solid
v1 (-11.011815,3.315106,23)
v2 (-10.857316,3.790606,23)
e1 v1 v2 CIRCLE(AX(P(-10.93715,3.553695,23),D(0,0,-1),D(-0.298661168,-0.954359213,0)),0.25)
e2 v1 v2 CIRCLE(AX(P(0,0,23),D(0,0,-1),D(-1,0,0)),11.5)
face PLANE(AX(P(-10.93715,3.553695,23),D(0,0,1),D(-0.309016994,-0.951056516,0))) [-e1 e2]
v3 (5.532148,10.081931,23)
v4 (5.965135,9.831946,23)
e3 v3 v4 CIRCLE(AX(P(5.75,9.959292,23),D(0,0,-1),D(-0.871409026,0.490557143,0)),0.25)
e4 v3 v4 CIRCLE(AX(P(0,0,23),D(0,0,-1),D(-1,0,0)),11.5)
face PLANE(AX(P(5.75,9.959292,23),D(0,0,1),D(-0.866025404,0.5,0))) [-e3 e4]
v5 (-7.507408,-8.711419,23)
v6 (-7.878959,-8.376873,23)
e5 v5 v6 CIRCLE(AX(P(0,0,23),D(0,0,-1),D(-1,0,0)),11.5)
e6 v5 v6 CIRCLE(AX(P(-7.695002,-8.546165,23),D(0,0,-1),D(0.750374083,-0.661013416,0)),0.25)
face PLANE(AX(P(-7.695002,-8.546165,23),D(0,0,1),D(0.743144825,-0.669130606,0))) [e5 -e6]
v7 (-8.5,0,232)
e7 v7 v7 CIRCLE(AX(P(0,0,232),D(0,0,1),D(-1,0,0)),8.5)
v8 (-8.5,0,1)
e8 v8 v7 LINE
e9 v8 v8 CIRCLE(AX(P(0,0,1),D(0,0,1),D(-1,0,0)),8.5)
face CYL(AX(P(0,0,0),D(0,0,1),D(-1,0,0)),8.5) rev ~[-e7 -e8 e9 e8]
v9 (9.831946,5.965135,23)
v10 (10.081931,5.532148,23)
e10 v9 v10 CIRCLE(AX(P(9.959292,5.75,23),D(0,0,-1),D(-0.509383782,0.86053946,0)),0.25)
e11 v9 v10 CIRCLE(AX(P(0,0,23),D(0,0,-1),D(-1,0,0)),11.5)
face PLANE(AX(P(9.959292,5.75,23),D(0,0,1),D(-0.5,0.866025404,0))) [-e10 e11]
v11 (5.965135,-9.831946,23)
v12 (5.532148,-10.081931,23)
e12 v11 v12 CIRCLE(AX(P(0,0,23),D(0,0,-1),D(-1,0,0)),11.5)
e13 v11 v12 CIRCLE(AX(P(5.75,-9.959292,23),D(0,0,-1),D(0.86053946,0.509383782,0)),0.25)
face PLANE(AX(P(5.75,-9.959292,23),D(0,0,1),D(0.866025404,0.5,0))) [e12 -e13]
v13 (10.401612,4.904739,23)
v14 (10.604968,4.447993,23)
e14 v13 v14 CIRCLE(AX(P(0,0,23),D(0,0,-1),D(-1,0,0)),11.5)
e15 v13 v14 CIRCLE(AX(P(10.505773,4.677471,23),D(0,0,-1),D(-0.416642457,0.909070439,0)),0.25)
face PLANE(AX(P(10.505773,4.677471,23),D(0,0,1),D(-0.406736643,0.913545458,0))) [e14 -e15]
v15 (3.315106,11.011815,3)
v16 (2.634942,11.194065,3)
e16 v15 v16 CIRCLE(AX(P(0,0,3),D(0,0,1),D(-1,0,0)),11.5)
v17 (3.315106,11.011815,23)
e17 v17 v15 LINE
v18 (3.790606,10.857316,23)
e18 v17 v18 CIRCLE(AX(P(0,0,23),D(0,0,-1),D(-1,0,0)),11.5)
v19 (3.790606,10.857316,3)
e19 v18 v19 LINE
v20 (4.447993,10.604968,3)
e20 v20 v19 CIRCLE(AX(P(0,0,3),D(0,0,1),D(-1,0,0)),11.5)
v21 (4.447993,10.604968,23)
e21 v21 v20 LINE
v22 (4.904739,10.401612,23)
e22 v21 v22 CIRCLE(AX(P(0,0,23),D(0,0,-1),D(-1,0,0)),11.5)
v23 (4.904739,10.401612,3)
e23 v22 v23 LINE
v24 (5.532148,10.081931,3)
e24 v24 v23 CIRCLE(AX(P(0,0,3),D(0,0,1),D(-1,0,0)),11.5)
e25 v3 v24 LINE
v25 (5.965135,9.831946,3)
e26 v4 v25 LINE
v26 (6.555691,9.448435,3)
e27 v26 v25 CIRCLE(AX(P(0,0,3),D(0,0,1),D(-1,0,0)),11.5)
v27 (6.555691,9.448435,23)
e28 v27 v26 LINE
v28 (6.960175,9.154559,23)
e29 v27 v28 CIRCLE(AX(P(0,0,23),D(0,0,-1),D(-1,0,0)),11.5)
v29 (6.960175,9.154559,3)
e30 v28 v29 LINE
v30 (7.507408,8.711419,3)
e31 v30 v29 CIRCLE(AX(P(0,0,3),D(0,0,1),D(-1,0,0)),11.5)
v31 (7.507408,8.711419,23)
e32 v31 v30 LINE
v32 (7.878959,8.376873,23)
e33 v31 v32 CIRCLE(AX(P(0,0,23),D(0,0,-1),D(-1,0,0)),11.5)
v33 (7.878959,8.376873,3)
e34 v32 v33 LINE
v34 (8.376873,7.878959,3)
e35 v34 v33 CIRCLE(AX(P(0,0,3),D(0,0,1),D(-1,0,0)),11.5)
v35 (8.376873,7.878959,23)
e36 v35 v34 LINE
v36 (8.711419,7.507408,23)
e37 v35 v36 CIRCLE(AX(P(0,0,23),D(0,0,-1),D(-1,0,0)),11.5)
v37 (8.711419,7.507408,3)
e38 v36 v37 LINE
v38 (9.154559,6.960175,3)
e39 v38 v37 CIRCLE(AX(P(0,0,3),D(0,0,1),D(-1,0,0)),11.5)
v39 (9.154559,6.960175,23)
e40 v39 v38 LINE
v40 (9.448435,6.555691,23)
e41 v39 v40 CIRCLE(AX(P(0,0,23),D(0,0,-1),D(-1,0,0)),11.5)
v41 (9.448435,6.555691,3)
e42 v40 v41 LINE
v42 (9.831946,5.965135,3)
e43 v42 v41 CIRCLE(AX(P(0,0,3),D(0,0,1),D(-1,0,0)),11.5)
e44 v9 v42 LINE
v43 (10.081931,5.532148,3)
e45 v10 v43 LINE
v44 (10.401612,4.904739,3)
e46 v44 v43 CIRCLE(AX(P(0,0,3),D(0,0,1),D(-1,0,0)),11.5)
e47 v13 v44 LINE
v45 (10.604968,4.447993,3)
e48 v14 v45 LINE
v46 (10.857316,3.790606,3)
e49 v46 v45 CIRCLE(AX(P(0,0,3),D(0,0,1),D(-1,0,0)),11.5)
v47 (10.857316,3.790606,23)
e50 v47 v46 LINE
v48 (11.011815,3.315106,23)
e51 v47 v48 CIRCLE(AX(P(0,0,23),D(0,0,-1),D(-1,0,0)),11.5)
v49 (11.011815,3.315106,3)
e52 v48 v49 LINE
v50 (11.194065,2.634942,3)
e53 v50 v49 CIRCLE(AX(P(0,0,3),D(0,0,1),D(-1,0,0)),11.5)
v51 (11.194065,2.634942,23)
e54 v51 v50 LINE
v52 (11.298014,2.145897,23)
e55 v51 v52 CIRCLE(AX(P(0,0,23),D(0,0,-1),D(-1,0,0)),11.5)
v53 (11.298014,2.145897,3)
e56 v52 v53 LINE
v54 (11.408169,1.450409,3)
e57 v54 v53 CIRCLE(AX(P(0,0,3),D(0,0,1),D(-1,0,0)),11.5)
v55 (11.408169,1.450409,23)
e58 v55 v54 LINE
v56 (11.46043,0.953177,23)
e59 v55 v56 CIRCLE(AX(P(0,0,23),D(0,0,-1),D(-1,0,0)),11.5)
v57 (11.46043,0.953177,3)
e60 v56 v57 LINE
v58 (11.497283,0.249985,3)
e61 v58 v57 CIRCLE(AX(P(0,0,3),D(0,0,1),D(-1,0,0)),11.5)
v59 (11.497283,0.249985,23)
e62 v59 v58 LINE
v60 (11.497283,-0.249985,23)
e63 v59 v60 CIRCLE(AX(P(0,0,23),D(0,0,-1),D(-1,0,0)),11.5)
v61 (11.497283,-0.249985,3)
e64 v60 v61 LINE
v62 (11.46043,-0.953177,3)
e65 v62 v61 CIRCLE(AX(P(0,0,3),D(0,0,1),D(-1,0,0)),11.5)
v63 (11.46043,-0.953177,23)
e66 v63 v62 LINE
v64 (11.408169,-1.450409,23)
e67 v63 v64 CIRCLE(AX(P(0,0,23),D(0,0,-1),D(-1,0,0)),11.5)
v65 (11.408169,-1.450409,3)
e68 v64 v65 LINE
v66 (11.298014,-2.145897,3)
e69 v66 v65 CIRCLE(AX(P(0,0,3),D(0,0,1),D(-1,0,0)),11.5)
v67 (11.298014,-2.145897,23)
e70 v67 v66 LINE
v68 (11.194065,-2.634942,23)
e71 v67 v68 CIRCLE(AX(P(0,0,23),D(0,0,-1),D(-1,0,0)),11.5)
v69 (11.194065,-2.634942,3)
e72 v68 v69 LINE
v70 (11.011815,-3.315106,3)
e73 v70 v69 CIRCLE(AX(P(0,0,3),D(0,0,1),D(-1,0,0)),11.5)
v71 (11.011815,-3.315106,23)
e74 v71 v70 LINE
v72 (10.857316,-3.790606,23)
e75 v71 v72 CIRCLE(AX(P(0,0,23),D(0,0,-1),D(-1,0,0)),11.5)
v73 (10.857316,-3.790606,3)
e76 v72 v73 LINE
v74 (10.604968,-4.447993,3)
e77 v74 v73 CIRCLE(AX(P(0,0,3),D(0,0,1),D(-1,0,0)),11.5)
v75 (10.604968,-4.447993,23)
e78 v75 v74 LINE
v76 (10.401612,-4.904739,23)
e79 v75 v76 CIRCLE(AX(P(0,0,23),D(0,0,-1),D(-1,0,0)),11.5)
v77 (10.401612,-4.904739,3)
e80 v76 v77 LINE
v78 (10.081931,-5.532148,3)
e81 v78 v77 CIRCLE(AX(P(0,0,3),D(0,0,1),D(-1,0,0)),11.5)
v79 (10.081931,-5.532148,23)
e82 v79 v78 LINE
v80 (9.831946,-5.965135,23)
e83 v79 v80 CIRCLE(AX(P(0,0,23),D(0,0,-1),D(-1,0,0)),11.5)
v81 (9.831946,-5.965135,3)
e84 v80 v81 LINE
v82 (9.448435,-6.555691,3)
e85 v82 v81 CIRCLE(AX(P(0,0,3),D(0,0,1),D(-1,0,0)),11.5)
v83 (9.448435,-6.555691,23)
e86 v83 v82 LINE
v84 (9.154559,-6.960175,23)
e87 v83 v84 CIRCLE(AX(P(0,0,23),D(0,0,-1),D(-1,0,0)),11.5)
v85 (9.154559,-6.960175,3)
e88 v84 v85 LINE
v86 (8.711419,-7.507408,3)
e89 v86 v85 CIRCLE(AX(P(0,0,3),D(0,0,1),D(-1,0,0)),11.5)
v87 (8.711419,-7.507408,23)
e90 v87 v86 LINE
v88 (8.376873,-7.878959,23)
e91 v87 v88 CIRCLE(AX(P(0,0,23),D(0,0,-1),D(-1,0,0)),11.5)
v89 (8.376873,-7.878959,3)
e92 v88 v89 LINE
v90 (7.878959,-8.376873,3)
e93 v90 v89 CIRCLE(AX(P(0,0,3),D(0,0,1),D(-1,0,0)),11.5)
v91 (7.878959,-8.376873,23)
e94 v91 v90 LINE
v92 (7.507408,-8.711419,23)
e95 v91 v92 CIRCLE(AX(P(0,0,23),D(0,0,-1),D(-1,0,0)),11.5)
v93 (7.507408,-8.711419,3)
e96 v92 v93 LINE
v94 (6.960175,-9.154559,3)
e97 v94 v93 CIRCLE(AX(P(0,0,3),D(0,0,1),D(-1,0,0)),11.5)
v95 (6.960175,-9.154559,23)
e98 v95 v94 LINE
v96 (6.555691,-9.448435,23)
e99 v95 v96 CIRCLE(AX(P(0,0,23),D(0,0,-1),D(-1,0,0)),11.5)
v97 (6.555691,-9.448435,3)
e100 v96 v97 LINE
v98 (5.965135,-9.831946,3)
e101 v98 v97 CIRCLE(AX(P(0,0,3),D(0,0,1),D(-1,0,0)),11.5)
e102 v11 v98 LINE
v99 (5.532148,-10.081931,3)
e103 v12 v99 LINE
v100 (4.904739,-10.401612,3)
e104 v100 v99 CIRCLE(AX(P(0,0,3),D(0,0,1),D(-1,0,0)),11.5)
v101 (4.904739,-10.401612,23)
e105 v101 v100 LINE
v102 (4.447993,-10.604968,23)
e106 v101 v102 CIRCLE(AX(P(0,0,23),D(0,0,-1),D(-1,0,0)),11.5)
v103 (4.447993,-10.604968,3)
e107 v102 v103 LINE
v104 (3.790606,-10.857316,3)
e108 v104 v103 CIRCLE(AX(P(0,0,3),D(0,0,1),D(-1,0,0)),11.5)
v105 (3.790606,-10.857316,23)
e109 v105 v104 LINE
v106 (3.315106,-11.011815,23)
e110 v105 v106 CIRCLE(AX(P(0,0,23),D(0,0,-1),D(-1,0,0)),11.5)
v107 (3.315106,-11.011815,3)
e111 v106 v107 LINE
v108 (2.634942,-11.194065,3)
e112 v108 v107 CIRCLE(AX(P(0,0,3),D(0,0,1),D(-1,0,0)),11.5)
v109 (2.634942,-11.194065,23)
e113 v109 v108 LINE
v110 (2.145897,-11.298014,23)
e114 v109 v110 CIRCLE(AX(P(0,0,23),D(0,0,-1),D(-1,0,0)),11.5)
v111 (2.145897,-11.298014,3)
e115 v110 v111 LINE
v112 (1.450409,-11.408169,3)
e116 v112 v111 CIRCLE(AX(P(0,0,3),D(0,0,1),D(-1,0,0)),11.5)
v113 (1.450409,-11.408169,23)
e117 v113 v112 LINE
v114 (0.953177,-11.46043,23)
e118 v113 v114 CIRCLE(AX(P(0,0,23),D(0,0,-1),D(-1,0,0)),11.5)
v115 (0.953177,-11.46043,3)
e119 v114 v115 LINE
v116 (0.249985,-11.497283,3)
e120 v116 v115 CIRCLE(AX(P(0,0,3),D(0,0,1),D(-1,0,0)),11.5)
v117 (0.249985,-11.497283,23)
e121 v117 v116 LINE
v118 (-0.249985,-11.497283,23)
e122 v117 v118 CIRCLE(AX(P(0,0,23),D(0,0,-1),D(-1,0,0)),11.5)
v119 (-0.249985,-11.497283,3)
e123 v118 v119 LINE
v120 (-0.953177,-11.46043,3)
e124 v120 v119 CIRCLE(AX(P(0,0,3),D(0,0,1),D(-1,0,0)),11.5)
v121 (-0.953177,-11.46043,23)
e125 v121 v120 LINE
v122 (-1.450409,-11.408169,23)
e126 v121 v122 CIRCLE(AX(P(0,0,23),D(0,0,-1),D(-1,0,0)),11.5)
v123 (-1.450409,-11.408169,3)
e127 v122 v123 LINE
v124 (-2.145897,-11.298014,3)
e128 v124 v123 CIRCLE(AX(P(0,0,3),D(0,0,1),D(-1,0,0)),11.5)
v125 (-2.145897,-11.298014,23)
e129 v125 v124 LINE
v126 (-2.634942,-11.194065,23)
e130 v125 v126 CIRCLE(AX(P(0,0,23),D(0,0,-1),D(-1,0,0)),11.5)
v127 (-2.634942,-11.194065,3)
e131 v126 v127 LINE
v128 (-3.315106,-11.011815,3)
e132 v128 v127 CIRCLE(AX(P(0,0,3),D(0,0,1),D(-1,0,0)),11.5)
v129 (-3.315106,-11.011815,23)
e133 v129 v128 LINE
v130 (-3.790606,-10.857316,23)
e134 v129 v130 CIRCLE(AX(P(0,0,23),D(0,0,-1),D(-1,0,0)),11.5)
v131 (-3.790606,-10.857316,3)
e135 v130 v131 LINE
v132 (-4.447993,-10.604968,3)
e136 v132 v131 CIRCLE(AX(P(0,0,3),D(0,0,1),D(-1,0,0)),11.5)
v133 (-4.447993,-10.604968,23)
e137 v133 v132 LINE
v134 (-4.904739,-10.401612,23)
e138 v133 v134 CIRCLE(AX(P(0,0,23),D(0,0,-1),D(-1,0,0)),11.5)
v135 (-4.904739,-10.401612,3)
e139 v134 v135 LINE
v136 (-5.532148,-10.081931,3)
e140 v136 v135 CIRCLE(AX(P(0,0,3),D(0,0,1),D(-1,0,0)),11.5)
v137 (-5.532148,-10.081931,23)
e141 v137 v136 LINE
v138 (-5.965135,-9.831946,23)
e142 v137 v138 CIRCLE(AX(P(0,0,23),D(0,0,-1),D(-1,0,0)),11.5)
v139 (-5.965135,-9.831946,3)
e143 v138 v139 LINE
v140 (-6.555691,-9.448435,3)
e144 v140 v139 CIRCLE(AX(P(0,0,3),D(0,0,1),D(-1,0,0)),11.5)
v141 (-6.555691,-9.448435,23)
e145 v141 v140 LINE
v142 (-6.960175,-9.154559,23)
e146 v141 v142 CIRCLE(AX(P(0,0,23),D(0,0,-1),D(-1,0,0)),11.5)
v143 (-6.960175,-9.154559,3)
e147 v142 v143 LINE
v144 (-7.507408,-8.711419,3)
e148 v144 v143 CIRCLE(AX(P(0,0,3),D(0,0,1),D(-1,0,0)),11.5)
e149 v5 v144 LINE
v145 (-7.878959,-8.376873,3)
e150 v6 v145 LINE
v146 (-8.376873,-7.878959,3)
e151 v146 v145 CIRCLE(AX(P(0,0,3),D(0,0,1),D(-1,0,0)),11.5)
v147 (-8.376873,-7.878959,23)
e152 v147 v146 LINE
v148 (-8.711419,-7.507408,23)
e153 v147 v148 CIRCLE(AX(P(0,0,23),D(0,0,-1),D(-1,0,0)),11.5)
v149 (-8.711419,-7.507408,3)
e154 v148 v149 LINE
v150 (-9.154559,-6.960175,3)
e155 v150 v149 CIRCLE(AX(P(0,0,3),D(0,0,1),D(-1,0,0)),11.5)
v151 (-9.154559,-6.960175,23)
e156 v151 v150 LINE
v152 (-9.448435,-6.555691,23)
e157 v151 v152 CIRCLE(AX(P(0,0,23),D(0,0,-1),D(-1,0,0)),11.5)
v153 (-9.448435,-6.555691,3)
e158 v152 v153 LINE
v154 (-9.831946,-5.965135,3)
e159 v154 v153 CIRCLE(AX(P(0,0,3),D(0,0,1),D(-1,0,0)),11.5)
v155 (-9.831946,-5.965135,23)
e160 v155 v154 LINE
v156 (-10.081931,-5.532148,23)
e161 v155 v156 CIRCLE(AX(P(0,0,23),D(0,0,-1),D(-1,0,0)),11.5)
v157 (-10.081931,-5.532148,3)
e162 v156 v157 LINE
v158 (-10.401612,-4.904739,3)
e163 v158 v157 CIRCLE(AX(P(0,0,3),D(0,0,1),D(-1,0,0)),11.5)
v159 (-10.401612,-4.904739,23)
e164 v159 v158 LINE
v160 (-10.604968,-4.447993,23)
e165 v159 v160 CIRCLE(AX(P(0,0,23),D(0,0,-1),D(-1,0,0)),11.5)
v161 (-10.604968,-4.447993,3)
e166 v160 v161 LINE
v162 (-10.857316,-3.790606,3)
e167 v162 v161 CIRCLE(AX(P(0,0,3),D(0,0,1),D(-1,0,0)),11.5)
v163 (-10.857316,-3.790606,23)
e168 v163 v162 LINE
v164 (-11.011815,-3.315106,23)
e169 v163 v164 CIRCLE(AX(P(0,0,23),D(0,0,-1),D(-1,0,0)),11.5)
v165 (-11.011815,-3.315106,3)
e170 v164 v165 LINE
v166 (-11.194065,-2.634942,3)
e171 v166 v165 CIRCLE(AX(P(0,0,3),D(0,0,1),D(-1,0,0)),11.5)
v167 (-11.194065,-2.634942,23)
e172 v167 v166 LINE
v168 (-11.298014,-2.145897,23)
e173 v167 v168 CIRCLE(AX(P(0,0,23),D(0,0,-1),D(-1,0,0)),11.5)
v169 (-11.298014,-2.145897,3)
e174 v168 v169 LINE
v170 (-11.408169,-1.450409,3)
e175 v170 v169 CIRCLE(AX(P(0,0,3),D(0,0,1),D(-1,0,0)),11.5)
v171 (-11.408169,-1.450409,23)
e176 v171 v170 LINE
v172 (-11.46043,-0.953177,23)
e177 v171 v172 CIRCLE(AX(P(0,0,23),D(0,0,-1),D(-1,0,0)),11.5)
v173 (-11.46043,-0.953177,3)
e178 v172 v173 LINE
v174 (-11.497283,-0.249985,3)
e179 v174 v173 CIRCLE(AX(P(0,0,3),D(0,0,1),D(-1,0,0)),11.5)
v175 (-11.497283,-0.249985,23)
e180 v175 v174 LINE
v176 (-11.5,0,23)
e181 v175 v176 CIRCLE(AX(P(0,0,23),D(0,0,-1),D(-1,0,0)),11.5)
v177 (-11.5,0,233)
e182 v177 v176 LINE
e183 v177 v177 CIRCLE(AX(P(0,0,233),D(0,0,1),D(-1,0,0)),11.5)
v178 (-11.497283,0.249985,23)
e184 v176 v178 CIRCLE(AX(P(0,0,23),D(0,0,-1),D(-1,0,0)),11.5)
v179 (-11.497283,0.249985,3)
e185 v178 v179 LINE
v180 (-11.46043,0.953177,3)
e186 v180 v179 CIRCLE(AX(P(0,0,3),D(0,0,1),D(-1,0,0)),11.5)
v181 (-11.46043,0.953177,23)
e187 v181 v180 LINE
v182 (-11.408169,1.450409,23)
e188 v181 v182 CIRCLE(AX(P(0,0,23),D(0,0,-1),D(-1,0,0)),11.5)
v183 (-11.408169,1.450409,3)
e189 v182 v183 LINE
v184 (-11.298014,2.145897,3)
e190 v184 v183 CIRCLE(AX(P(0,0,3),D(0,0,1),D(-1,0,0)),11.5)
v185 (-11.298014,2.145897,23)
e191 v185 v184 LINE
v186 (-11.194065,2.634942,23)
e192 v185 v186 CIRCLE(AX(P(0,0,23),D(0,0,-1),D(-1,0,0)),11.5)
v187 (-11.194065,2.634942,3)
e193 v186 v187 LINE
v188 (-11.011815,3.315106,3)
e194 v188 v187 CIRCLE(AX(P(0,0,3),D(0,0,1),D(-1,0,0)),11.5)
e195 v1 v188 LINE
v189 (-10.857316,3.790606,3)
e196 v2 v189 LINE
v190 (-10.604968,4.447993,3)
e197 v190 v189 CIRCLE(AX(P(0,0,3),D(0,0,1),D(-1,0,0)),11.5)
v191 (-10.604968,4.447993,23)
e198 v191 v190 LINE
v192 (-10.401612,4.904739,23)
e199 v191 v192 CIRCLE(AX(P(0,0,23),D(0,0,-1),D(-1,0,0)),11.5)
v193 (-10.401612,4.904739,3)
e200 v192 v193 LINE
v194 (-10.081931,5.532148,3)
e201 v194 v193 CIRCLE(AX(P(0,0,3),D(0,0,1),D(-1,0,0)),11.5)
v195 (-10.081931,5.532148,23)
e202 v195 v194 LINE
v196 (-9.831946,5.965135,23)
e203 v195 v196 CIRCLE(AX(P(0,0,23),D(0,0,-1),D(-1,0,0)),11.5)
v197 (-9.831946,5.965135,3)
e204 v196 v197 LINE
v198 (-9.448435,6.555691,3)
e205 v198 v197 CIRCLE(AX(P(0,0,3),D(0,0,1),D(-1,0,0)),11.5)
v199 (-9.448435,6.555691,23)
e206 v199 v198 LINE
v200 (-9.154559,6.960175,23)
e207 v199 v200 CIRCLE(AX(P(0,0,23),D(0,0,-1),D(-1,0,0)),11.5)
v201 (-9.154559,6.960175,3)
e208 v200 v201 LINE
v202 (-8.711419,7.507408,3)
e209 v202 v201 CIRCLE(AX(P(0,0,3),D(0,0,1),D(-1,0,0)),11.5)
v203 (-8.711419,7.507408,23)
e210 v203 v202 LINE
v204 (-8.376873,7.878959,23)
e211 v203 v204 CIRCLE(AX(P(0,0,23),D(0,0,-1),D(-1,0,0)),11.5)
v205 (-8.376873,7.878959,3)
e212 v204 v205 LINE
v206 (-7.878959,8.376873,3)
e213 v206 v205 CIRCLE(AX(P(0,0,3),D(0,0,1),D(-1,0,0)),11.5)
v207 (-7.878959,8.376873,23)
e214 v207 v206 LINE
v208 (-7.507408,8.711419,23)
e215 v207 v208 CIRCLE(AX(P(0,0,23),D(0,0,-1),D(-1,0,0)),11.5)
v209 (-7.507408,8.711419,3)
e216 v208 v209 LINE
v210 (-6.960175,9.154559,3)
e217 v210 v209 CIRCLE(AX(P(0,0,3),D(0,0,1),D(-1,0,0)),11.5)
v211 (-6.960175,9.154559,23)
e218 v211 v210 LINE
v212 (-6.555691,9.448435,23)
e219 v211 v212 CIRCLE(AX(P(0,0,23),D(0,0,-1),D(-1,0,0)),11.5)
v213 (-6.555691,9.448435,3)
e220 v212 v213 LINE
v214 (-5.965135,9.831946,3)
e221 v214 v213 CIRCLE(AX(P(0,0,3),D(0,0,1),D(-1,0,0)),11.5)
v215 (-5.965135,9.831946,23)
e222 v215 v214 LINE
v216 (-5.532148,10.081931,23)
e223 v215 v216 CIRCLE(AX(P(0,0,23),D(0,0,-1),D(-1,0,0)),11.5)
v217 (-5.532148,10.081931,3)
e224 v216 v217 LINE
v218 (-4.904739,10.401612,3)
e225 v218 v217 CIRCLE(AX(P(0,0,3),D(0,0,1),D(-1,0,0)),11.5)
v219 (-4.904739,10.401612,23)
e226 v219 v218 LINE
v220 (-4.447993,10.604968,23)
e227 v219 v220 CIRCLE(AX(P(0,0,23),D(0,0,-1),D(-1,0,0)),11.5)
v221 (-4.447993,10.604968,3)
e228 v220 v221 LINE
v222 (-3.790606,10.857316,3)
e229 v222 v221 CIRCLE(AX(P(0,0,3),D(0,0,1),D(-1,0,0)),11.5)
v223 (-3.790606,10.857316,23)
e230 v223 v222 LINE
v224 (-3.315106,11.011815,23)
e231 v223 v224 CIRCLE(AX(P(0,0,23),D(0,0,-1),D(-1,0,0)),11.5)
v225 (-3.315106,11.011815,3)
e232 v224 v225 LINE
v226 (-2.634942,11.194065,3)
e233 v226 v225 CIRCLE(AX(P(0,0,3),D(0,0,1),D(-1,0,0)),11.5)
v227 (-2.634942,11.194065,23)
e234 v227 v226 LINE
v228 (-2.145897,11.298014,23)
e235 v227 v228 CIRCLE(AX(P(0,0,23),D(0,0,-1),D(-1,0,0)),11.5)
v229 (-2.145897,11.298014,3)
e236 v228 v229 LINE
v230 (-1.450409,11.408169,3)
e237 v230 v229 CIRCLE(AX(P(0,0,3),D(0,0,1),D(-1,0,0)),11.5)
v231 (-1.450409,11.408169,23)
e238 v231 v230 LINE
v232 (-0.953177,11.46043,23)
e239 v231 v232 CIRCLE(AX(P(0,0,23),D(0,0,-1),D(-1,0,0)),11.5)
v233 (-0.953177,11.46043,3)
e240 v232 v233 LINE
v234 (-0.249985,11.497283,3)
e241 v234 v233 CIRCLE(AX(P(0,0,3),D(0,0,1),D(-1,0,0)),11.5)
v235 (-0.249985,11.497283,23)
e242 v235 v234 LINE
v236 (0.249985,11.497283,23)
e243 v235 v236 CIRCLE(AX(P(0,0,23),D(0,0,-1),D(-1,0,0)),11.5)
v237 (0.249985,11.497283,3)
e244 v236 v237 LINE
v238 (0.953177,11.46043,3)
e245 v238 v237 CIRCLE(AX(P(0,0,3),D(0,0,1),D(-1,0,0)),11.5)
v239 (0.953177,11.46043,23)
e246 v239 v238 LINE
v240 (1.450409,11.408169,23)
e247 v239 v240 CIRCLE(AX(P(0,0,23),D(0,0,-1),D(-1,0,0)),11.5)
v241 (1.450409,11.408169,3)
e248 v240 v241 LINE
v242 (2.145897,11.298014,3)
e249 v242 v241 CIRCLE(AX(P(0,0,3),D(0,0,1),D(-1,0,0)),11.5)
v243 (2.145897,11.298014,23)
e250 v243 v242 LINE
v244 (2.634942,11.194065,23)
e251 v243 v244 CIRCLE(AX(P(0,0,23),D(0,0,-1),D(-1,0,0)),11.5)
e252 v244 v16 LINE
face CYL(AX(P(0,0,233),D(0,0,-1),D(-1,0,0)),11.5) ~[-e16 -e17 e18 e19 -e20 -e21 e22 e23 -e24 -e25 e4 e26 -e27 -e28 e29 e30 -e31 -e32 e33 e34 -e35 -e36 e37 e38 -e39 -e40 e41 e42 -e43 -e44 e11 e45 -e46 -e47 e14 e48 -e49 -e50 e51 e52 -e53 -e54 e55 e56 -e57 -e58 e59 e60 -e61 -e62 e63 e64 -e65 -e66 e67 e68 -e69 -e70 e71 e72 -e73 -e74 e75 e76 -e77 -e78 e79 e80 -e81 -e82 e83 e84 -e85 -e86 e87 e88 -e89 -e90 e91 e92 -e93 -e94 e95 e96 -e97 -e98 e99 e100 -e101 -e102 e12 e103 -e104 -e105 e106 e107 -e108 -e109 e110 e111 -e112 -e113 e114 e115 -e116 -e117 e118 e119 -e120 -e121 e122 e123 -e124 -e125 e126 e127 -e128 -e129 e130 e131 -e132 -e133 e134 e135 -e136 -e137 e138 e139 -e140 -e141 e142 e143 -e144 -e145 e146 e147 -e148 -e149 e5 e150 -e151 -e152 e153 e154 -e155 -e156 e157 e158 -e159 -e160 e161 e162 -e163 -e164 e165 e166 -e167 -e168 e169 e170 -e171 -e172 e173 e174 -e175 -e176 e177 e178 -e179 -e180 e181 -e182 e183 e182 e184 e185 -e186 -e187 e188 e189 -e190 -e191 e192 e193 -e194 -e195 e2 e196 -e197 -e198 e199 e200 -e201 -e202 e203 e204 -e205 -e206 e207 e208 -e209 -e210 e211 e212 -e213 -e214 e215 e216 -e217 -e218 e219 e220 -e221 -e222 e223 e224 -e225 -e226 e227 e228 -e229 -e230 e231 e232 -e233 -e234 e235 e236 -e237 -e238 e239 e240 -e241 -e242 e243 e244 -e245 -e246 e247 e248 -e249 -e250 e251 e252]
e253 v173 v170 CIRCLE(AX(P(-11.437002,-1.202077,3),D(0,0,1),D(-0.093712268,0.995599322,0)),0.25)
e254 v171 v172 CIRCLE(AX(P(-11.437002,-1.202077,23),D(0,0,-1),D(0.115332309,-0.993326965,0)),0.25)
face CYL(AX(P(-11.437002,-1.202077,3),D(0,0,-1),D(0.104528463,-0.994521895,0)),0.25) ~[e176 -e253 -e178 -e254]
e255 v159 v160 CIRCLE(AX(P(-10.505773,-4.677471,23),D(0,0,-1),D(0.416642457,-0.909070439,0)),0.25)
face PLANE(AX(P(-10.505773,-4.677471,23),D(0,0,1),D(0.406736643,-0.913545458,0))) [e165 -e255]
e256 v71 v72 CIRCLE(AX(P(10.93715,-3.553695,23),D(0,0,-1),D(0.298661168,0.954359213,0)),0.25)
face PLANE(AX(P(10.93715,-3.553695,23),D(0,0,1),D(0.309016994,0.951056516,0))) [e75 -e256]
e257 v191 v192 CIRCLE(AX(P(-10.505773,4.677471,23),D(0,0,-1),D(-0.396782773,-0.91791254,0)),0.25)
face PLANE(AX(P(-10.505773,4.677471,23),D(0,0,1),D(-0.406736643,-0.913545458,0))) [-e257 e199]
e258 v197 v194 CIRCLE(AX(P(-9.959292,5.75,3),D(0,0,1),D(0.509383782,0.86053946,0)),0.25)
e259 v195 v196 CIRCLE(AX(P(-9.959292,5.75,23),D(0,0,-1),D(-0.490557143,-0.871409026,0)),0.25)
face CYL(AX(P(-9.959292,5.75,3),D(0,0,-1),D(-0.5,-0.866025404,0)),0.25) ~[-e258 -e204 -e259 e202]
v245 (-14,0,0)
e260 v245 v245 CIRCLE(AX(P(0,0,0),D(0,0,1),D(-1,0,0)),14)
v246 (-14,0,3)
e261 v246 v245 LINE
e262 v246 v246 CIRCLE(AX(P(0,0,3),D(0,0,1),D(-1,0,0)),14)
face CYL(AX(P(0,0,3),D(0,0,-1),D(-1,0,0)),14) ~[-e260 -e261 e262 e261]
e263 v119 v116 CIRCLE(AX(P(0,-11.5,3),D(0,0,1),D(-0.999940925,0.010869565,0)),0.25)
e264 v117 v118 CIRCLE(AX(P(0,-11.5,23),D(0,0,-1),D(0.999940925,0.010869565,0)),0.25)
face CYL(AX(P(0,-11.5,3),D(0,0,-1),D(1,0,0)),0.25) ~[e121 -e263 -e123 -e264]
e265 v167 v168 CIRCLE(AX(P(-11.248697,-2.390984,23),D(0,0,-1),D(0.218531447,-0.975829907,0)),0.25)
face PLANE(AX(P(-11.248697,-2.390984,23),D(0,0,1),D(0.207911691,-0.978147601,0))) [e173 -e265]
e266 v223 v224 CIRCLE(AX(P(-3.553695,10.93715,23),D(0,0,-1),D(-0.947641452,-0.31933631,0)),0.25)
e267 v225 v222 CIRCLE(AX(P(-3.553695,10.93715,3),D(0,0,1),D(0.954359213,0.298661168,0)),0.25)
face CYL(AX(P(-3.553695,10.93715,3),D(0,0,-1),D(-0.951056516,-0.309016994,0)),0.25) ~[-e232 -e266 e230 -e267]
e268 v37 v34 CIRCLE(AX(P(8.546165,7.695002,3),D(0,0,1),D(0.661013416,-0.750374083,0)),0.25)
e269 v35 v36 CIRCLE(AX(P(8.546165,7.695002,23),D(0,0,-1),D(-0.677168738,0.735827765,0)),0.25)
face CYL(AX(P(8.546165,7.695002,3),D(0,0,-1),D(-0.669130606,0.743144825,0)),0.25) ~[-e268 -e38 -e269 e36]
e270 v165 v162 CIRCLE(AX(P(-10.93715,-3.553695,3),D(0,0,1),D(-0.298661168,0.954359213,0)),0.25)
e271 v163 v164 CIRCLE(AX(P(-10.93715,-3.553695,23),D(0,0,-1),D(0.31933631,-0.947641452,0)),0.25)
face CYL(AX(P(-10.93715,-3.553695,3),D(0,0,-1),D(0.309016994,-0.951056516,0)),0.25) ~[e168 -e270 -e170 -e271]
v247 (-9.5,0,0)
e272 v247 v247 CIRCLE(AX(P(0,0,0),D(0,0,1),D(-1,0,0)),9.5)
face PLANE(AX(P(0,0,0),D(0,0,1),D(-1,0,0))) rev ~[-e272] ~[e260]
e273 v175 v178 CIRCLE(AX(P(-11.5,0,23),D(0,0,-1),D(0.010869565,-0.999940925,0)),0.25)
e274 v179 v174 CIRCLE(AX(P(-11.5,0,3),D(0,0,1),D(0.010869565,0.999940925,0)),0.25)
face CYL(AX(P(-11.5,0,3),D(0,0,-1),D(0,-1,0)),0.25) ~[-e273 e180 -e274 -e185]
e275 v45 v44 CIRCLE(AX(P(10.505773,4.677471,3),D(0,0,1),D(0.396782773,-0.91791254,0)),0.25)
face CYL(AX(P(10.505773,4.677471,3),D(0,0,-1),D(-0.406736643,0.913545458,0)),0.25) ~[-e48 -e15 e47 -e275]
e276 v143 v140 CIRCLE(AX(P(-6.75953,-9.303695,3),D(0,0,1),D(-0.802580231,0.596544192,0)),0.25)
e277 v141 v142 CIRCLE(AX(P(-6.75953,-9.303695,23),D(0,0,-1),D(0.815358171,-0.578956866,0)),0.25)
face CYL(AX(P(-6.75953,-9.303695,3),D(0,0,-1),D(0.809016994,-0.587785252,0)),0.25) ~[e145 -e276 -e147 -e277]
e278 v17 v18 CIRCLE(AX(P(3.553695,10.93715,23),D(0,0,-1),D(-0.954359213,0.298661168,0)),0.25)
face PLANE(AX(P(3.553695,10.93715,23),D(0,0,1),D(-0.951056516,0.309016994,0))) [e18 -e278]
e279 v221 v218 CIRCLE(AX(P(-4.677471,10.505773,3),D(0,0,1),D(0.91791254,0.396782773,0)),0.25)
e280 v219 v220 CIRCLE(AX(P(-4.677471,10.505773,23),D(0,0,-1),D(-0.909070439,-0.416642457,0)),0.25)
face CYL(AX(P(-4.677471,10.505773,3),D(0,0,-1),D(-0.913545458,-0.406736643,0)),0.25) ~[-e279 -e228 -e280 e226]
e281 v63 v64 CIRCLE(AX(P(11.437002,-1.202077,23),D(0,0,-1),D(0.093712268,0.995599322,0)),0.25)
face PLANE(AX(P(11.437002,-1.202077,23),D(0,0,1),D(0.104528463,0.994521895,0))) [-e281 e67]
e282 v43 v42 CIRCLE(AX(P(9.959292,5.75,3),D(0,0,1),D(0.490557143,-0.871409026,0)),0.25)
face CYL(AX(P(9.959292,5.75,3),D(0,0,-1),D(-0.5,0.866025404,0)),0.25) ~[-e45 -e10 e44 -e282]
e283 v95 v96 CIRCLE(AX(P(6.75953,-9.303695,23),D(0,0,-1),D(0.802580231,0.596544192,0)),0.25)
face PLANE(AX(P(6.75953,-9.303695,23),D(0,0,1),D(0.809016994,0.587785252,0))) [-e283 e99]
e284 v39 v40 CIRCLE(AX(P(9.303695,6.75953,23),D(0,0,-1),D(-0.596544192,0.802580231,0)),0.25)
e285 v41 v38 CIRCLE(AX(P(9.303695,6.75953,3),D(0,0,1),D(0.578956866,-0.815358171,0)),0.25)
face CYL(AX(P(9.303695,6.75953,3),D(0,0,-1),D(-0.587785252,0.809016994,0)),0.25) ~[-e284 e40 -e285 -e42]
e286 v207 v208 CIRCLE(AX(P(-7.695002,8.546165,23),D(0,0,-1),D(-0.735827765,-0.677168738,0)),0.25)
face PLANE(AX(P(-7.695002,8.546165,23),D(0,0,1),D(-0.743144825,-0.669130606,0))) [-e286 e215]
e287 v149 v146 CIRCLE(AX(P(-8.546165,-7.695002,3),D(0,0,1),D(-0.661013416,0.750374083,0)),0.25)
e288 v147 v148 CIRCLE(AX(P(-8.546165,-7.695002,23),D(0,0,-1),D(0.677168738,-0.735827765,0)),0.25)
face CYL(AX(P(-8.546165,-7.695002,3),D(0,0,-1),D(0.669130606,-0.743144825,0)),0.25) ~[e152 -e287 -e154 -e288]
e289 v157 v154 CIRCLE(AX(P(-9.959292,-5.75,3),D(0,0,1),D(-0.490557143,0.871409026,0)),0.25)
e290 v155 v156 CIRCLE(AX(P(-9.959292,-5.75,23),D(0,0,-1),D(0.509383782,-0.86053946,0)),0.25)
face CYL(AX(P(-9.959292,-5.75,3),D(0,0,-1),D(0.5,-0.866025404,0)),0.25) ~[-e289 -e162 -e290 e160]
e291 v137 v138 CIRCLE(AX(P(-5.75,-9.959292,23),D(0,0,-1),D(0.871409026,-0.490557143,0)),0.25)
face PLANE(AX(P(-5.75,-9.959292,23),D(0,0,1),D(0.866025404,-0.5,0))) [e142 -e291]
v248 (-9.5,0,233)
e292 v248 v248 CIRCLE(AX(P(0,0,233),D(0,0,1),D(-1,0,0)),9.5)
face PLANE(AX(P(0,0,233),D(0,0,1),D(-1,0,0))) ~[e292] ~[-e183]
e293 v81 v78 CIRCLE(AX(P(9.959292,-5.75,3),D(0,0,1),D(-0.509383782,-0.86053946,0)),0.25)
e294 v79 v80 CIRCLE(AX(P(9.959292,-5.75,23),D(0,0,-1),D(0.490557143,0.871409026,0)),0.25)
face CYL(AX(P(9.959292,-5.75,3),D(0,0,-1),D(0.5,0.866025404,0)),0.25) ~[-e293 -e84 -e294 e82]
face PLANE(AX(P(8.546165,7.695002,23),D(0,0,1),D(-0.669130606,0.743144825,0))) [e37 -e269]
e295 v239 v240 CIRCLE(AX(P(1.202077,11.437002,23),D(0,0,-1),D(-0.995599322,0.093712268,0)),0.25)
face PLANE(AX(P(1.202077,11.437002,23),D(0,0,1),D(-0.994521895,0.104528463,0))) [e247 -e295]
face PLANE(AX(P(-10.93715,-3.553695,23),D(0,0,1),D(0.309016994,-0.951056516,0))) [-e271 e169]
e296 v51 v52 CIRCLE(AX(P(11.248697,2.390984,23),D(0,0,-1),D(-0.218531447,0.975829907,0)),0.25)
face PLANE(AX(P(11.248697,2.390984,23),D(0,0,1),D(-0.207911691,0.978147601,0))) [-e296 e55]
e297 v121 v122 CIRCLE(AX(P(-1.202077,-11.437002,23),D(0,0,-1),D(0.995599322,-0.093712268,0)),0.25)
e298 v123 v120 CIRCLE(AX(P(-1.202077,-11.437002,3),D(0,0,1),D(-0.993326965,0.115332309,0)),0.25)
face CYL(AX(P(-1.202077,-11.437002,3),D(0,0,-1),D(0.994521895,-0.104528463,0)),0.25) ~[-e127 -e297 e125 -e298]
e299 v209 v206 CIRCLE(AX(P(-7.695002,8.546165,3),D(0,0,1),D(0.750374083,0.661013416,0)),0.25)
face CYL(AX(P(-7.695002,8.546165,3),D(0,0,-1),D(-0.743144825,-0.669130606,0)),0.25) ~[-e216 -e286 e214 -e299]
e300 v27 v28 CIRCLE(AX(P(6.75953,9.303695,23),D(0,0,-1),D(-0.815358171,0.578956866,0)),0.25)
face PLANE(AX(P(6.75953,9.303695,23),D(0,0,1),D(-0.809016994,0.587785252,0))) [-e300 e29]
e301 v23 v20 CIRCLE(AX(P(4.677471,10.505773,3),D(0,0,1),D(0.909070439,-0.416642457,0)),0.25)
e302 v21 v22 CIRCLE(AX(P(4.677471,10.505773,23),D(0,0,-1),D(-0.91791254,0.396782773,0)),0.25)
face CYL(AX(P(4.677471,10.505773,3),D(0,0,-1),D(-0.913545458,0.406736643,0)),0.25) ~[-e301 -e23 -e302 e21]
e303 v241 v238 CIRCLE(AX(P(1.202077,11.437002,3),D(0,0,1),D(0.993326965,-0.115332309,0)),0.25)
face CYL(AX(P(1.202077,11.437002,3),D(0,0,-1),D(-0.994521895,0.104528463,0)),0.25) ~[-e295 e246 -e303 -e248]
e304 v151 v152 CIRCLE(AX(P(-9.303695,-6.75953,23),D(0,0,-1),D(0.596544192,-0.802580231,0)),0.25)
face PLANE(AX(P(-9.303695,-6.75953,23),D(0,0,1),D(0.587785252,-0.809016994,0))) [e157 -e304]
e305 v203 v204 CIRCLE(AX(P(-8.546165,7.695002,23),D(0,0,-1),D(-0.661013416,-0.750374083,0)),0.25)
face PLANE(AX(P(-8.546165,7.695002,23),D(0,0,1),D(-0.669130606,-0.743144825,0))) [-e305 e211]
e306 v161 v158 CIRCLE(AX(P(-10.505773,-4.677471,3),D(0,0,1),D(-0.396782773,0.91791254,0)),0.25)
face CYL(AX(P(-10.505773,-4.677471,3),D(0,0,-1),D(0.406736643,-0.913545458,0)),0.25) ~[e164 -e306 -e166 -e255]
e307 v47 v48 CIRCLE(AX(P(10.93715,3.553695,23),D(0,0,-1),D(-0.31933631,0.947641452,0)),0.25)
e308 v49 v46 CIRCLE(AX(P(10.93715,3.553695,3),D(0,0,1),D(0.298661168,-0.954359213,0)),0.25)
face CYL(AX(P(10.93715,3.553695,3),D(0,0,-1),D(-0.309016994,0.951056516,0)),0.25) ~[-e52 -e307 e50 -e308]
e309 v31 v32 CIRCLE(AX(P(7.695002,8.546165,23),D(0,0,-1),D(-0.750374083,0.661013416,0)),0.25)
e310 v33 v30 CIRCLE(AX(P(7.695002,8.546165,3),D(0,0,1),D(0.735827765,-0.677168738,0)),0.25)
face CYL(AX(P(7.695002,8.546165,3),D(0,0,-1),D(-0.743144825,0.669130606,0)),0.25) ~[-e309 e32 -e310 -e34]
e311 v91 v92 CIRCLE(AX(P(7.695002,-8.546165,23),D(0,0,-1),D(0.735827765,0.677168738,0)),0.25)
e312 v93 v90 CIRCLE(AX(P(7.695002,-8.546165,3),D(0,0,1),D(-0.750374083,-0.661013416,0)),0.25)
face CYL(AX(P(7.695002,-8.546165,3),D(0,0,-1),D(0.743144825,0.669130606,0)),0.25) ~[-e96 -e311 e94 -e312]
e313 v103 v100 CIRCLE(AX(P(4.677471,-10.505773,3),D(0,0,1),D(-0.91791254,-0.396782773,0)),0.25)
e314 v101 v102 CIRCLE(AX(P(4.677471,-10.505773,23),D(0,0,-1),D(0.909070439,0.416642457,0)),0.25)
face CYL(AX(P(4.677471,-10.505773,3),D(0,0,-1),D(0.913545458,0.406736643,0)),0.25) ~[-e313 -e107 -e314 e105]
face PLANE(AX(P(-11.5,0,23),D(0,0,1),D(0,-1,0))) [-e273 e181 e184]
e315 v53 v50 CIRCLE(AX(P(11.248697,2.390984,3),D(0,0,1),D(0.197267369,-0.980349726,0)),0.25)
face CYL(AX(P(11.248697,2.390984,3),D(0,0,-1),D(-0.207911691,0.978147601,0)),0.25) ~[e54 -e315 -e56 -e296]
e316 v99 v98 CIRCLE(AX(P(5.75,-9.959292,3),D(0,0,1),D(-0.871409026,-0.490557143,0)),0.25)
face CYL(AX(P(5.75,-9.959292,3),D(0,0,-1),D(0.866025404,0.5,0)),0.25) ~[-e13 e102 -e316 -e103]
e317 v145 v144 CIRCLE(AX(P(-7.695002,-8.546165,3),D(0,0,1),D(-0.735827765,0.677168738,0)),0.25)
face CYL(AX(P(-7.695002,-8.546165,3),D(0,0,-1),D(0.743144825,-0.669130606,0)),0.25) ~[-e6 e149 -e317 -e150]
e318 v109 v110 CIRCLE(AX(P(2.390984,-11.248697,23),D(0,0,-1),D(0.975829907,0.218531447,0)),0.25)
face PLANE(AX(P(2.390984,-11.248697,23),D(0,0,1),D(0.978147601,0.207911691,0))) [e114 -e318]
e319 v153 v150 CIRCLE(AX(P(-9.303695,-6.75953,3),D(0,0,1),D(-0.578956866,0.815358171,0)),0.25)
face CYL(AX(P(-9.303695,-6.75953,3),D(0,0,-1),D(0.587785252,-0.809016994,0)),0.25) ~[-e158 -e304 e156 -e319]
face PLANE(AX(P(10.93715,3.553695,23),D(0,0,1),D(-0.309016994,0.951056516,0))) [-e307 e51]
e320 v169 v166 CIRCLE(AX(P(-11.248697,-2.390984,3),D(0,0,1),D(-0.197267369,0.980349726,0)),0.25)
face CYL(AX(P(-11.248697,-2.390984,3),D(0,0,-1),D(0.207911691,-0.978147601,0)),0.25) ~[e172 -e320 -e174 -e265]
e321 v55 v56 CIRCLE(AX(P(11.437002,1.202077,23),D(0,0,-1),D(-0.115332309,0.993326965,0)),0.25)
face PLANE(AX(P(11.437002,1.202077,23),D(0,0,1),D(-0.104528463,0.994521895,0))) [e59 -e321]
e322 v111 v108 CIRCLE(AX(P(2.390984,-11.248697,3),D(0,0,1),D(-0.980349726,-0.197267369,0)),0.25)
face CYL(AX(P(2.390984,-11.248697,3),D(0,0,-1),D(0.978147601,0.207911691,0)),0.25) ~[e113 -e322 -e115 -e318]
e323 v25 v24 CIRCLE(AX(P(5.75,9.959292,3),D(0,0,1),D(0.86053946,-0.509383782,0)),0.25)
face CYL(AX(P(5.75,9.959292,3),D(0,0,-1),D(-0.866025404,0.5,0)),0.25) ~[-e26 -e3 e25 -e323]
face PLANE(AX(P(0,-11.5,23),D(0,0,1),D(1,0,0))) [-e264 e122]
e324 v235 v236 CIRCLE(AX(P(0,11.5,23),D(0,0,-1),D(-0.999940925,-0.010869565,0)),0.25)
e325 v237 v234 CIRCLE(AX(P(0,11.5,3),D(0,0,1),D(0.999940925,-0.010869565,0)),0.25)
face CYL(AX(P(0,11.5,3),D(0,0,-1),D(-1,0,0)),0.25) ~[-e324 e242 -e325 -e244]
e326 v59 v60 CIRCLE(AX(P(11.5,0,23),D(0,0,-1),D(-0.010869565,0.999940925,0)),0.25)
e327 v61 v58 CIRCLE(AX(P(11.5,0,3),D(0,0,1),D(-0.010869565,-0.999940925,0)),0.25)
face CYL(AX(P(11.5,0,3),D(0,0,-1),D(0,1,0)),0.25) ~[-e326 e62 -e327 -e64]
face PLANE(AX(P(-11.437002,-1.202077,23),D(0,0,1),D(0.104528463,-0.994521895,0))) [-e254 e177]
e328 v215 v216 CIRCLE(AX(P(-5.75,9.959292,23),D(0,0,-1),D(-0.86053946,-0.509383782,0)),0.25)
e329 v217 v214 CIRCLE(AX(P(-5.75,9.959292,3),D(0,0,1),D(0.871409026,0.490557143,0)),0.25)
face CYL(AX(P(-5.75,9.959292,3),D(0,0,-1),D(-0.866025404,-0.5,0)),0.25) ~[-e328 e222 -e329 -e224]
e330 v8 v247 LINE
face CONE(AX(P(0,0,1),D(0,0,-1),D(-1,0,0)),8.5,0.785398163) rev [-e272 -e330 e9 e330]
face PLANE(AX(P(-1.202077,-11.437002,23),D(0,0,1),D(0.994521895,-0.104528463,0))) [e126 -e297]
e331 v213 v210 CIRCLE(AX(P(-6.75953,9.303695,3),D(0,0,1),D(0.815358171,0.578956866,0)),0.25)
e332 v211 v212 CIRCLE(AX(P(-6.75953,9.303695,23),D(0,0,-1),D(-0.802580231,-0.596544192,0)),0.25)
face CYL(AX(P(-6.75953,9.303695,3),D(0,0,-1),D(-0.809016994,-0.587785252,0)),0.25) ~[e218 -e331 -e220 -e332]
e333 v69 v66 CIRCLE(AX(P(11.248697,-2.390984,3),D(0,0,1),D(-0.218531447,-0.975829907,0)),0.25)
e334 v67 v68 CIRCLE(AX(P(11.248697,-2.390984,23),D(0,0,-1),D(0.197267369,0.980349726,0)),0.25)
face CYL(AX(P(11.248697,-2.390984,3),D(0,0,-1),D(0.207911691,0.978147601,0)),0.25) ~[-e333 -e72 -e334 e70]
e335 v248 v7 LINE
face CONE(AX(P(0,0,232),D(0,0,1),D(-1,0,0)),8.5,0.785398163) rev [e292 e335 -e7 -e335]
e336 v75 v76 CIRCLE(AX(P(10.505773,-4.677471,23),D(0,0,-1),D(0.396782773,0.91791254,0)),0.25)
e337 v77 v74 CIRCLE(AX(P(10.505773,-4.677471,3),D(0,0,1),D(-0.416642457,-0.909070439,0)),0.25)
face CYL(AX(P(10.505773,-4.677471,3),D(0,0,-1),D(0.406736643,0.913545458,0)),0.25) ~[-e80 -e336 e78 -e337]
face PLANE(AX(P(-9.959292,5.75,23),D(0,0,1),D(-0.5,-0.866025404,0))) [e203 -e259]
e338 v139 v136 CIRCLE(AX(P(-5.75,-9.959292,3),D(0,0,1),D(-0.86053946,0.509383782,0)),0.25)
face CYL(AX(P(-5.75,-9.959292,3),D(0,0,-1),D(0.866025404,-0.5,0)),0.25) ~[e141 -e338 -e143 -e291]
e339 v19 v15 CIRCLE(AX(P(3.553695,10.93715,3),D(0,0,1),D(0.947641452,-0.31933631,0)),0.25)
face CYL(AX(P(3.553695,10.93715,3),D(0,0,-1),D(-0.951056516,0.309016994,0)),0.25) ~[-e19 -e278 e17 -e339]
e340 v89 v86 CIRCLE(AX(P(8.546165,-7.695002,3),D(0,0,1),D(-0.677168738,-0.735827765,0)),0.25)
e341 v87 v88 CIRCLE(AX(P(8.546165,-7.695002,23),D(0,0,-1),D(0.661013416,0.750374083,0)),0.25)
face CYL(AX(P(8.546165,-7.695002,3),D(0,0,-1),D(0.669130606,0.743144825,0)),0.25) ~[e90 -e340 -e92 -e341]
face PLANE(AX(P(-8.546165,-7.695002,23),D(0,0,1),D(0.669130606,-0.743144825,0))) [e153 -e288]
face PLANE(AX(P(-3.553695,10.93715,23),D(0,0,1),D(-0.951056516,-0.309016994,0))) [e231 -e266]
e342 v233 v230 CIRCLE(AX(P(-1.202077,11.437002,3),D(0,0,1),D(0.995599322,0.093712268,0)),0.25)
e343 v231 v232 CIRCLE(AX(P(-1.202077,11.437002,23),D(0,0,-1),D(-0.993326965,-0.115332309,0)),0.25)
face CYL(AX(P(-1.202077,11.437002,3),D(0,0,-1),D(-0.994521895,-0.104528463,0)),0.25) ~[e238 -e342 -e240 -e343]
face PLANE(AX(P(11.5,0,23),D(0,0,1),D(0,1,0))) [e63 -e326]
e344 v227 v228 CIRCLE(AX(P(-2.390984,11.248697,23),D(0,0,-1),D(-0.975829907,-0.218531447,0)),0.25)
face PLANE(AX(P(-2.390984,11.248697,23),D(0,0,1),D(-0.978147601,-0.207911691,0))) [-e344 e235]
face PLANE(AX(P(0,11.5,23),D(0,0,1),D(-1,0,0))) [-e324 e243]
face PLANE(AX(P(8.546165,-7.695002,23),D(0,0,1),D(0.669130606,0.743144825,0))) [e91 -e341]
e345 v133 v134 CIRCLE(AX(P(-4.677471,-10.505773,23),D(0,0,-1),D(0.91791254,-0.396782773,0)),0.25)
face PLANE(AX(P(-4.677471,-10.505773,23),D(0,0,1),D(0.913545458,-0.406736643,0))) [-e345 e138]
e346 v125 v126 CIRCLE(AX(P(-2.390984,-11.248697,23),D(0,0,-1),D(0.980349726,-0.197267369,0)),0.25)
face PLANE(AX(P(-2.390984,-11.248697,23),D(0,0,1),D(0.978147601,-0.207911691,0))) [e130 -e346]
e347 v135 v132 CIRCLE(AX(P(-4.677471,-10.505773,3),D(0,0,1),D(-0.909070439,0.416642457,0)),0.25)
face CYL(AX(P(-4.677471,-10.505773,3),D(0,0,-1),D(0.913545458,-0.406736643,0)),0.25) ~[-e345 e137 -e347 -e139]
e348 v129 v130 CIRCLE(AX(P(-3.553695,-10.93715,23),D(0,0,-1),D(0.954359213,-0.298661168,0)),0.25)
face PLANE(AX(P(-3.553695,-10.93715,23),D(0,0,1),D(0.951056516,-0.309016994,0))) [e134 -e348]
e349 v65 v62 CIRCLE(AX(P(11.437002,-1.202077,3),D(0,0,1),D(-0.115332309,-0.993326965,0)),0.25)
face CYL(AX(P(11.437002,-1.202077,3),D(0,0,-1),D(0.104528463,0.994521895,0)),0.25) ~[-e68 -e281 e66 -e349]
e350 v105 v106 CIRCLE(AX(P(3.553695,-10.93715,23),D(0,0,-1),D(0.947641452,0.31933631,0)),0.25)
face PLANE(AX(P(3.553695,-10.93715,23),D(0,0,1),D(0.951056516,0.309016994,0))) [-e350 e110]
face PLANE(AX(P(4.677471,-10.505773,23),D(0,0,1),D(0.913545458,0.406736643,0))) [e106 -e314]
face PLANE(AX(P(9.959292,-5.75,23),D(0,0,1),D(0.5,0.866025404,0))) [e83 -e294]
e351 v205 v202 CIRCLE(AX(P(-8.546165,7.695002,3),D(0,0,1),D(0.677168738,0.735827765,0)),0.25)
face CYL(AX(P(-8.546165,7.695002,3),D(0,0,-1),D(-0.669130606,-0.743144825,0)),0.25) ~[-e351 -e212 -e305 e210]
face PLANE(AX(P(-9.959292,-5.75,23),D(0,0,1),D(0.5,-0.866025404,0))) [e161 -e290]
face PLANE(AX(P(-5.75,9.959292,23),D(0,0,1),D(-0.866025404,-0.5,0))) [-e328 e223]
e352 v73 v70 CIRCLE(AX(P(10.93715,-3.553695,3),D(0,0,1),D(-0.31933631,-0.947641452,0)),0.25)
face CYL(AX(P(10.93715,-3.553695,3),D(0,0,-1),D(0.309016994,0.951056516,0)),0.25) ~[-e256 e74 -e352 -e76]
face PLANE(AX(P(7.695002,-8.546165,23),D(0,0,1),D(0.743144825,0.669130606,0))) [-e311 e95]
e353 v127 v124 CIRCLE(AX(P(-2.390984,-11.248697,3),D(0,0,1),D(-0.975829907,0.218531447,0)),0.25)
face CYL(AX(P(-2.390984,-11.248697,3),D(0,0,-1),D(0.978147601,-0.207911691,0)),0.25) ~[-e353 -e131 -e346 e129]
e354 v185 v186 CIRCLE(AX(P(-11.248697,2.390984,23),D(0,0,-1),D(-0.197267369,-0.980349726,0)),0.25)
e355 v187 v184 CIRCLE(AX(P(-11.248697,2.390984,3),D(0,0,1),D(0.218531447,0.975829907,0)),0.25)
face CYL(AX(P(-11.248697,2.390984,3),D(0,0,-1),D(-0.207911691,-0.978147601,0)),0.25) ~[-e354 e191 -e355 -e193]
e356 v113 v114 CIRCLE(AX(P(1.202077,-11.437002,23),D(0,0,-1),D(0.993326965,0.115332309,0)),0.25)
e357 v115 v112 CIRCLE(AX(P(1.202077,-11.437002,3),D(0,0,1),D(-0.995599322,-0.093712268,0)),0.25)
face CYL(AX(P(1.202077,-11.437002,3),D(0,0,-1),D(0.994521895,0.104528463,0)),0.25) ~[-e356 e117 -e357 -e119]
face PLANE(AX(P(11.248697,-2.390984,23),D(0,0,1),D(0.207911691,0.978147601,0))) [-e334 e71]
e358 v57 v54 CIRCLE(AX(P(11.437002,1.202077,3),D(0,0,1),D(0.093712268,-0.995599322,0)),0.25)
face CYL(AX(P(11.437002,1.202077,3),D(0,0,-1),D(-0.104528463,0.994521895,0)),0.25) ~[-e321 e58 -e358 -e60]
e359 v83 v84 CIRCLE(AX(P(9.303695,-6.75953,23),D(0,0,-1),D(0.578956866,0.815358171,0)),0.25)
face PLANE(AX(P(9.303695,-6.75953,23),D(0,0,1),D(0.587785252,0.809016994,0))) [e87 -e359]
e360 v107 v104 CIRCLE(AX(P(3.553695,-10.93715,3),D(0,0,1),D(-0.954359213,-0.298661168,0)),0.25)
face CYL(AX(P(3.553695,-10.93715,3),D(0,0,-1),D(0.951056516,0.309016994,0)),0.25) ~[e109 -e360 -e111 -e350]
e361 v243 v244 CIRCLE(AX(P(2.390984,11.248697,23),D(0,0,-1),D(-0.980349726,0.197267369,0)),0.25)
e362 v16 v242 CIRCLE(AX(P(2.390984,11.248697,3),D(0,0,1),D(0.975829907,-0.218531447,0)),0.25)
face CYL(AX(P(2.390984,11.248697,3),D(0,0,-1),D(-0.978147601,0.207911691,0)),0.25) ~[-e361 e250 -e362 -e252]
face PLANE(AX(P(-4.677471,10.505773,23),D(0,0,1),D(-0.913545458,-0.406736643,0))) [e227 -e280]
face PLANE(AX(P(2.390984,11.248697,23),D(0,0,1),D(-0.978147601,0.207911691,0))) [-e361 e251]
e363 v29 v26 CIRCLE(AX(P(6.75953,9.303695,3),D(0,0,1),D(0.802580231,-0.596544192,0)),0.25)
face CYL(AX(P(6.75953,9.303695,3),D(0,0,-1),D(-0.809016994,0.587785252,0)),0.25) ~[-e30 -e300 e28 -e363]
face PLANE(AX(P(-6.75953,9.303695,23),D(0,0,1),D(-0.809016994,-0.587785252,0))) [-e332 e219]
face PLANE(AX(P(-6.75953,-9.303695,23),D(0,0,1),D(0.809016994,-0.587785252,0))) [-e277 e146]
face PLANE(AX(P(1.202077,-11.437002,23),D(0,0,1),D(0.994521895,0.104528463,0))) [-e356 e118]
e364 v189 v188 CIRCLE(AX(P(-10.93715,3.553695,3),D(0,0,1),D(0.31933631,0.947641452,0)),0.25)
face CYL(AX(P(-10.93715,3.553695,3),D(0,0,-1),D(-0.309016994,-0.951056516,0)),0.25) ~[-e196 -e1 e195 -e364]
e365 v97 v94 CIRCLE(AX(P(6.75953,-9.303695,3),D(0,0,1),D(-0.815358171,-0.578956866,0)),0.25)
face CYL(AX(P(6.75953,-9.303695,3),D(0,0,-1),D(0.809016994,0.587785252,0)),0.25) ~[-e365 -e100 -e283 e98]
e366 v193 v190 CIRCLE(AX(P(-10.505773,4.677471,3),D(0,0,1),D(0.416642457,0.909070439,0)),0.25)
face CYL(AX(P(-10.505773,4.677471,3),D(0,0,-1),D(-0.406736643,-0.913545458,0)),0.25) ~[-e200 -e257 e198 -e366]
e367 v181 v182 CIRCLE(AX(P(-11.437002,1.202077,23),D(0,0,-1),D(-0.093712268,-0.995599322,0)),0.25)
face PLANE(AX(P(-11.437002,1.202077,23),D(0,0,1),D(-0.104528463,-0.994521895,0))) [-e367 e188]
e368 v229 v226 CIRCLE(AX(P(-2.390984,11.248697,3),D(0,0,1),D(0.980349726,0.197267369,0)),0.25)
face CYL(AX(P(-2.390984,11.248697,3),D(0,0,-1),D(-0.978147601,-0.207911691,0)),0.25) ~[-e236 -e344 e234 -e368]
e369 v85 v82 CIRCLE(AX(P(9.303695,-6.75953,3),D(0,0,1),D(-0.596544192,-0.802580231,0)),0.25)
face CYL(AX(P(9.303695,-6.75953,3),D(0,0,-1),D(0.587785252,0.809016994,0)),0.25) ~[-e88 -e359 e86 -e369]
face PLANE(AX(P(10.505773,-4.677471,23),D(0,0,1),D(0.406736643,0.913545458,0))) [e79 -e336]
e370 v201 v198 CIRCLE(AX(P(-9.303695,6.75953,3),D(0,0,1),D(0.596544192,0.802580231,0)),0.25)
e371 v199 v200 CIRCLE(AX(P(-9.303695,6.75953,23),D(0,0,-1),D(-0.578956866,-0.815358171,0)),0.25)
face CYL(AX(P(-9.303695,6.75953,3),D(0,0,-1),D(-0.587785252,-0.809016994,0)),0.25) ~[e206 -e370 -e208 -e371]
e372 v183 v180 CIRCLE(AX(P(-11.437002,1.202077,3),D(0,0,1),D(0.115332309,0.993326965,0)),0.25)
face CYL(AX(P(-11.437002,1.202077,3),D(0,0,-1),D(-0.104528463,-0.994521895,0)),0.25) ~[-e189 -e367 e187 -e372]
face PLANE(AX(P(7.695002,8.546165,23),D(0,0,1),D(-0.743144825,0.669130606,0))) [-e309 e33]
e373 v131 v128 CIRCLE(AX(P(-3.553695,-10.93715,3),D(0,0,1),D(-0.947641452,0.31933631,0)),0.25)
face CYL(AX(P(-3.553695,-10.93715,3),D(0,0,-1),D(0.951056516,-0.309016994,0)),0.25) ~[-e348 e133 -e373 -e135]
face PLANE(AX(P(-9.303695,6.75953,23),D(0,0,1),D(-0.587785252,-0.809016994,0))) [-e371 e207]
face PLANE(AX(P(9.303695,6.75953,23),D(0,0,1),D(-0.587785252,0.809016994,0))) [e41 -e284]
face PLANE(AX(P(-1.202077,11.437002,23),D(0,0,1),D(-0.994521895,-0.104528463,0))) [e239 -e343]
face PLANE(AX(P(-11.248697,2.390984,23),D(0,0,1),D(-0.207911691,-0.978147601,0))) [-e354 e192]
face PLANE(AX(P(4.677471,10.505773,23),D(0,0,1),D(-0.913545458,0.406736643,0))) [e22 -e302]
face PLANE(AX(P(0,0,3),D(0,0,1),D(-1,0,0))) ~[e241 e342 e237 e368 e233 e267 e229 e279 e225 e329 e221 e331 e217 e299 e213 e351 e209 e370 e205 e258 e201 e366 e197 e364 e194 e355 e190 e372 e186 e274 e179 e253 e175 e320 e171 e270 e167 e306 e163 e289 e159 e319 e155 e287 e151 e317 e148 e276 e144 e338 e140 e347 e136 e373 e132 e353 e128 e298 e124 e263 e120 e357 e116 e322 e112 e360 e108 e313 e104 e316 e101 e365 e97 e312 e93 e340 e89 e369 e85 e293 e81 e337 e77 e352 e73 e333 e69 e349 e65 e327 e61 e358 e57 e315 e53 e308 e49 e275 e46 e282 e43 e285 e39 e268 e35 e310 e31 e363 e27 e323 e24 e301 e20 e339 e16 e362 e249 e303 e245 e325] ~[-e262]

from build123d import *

# Parameters (mm, degrees)
F2_R            = 0.25
F3_DEPTH        = 20
F3_COPIES_COUNT = 60
F4_SIZE         = 1


# Not quite as in the source:
# - a pattern or mirror of a feature is missing from the dataset's text; its kind, count and spacing are read off the source's solid


with BuildPart() as f1:
    # F0 (on Front) → F1 (revolve)
    with BuildSketch(Plane.XZ):
        Polygon((-14, 0), (-8.5, 0), (-8.5, 233), (-11.5, 233), (-11.5, 3), (-14, 3), align=None)
    revolve(axis=Axis((0, 0, 48.0585359184), (0, 0, 1)))

    # F2 (on face) → F3 (join)
    with BuildSketch(Plane.XY.offset(3)):
        with Locations((0, -11.5)):
            Circle(F2_R)
    f3 = extrude(amount=F3_DEPTH)

    # F3_copies: F3 ×60 about axis
    f3_copies_axis = Axis((0, 0, 0), (0, 0, 1))
    for i in range(1, F3_COPIES_COUNT):
        add(f3.rotate(f3_copies_axis, i * 360 / F3_COPIES_COUNT))

    # F4
    f4_edges = [f1.edges().sort_by_distance(p)[0] for p in [
        (8.5, 0, 0),
        (8.5, 0, 233),
    ]]
    chamfer(f4_edges, length=F4_SIZE)


solid = f1.part
